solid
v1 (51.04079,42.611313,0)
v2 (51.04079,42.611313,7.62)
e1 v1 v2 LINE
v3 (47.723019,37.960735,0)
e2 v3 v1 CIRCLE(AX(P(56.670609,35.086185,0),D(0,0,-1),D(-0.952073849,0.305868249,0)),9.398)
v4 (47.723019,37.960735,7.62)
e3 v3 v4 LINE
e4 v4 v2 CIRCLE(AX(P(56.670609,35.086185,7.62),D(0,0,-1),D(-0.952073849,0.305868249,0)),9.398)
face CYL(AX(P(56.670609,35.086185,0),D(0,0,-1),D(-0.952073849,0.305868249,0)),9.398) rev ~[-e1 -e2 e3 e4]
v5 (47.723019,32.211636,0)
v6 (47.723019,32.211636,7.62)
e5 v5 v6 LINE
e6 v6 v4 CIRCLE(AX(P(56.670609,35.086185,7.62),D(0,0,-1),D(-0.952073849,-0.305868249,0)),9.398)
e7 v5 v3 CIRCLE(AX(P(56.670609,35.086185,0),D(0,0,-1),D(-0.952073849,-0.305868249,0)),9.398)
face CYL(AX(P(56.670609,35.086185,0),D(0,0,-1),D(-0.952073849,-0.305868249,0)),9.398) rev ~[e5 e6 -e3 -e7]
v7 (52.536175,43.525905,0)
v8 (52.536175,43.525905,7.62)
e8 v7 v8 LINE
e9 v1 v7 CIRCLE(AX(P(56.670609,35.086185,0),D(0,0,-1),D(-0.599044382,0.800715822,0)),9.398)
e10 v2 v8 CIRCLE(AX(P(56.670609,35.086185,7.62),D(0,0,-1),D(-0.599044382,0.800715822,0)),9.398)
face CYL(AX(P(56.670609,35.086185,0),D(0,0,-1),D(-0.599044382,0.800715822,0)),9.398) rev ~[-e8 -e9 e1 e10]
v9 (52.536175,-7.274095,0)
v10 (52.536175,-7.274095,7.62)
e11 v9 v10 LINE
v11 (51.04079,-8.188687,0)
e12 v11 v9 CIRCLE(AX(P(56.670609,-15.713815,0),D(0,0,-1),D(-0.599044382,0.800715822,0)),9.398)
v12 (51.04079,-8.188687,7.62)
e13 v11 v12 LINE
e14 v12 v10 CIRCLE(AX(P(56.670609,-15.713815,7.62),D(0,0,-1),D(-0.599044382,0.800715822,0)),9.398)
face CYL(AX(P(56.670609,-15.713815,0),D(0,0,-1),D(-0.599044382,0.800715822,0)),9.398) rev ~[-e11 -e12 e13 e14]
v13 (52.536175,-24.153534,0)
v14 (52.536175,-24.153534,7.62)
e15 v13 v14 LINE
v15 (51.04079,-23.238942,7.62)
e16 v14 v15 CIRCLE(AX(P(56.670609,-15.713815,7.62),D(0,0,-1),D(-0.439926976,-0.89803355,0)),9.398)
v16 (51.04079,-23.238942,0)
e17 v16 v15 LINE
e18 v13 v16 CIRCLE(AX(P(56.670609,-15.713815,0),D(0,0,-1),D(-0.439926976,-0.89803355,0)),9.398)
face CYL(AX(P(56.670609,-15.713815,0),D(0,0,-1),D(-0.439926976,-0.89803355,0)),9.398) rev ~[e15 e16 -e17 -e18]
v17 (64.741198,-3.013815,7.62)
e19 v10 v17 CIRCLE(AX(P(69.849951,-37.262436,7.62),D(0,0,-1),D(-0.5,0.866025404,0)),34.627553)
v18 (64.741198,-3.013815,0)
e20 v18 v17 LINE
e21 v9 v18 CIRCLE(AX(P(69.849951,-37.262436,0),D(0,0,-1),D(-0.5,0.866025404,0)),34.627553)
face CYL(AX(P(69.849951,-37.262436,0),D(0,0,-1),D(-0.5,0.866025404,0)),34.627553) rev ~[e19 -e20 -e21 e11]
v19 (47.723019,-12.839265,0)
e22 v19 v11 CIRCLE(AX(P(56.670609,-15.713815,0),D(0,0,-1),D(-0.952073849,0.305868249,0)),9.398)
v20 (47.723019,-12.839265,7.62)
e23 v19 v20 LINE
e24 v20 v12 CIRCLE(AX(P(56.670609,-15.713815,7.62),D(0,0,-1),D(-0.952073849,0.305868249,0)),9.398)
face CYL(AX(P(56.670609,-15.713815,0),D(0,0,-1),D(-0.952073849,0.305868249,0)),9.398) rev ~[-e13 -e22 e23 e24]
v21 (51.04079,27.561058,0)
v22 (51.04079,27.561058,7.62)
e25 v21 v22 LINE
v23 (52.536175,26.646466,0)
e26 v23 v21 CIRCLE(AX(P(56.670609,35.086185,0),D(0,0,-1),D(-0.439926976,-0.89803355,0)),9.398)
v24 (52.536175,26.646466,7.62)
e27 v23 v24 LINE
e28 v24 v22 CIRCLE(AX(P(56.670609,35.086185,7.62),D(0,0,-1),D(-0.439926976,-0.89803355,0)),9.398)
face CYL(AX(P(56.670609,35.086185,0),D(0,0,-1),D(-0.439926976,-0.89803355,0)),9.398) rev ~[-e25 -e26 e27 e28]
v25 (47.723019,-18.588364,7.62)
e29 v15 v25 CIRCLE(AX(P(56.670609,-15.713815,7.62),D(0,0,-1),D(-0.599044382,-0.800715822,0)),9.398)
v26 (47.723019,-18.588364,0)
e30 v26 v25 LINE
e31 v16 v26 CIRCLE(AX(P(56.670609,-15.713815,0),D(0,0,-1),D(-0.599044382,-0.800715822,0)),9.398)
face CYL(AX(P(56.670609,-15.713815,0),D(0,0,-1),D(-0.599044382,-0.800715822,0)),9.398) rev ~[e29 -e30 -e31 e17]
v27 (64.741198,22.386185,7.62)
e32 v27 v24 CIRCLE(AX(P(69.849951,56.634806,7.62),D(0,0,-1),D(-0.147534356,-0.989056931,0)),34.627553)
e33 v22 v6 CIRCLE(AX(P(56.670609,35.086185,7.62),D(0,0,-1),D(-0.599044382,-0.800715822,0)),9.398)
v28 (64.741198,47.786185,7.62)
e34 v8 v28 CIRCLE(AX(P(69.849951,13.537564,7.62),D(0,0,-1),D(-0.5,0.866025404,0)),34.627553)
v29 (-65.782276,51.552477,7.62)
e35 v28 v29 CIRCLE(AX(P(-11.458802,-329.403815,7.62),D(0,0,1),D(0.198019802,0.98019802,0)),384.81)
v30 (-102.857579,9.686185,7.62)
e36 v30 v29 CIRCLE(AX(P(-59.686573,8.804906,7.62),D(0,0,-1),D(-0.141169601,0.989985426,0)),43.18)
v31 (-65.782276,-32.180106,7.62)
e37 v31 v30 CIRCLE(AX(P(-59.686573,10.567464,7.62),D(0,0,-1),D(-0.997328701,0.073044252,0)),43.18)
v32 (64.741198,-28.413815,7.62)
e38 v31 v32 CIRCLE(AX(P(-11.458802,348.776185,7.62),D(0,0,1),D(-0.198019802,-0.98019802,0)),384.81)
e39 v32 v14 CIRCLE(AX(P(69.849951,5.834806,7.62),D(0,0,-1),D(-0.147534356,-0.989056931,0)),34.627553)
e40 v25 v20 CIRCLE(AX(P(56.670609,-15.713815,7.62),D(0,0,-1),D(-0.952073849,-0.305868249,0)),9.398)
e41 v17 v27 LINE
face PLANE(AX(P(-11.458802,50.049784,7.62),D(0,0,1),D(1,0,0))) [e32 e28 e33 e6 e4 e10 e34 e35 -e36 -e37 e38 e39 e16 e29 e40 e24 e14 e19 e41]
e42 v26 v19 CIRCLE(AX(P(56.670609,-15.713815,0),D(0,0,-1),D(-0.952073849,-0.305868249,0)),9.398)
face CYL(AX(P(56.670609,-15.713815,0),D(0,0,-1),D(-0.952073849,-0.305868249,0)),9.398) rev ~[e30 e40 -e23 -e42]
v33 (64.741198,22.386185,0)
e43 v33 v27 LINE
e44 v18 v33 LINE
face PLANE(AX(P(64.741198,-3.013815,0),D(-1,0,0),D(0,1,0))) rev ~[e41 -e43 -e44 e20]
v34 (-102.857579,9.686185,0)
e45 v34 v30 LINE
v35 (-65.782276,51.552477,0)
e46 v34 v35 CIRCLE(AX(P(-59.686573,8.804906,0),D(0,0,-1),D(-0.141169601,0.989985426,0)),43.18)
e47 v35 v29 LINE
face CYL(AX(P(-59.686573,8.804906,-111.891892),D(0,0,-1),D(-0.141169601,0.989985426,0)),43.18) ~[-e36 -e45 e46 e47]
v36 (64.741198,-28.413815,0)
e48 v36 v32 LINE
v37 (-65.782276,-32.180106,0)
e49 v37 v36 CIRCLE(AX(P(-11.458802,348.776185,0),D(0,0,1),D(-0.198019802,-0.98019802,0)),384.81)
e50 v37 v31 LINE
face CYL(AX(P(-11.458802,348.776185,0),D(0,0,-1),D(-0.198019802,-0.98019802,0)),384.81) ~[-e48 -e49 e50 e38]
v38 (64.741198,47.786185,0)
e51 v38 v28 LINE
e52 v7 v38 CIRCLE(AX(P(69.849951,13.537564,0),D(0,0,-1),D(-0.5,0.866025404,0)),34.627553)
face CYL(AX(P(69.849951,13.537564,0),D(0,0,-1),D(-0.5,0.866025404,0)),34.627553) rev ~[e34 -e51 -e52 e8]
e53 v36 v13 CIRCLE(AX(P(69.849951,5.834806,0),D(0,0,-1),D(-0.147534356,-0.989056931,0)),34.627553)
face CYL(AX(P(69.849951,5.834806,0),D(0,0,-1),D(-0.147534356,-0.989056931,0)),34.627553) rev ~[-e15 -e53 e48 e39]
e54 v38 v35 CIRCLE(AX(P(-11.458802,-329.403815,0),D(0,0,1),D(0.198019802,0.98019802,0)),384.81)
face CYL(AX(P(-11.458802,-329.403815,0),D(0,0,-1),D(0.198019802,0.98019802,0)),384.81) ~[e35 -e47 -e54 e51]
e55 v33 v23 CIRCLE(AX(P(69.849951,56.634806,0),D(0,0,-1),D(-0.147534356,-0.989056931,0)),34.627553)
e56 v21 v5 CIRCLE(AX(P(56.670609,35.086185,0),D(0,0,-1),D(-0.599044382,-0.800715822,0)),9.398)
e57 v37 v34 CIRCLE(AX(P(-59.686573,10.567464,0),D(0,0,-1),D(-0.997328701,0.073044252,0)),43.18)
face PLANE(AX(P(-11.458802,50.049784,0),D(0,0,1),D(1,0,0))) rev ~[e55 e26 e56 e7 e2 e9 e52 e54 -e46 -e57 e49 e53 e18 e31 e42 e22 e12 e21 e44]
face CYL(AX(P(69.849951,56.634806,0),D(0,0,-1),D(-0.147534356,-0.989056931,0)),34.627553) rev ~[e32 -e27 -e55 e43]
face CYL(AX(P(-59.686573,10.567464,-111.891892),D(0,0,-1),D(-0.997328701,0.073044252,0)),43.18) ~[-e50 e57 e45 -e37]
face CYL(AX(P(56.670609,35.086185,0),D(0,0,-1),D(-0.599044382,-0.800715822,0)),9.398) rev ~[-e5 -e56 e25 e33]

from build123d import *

# Parameters (mm, degrees)
F1_DEPTH    = 7.62
F2_T1_DEPTH = 231.4037837241


# Not quite as in the source:
# - a fillet or chamfer that OpenCascade refuses, or shapes differently, is made with other operations: its cross-section is extruded or revolved along the edge and cut away or added


with BuildPart() as f1:
    # F0 (on Top) → F1 (new body)
    with BuildSketch(Plane.XY):
        with BuildLine():
            ThreePointArc((64.7411976721, 47.7861853946), (-11.4588023279, 55.4061853946), (-87.6588023279, 47.7861853946))
            Line((-87.6588023279, 47.7861853946), (64.7411976721, 47.7861853946))
        make_face()
        with BuildLine():
            Line((-87.6588023279, -28.4138146054), (-87.6588023279, 47.7861853946))
            ThreePointArc((-87.6588023279, 47.7861853946), (-102.8988023279, 9.6861853946), (-87.6588023279, -28.4138146054))
        make_face()
        with BuildLine():
            Line((64.7411976721, 47.7861853946), (-87.6588023279, 47.7861853946))
            Line((-87.6588023279, 47.7861853946), (-87.6588023279, -28.4138146054))
            Line((-87.6588023279, -28.4138146054), (64.7411976721, -28.4138146054))
            ThreePointArc((64.7411976721, -28.4138146054), (58.4381171141, -26.858273051), (52.536175044, -24.1535339048))
            ThreePointArc((52.536175044, -24.1535339048), (51.7671122609, -23.7311786415), (51.0407896557, -23.2389419038))
            ThreePointArc((51.0407896557, -23.2389419038), (46.5861857996, -19.8140652327), (42.744152416, -15.7138146054))
            ThreePointArc((42.744152416, -15.7138146054), (46.5861857996, -11.6135639782), (51.0407896557, -8.188687307))
            ThreePointArc((51.0407896557, -8.188687307), (51.7671122609, -7.6964505693), (52.536175044, -7.2740953061))
            ThreePointArc((52.536175044, -7.2740953061), (58.4381171141, -4.5693561598), (64.7411976721, -3.0138146054))
            Line((64.7411976721, -3.0138146054), (64.7411976721, 22.3861853946))
            ThreePointArc((64.7411976721, 22.3861853946), (58.4381171141, 23.941726949), (52.536175044, 26.6464660952))
            ThreePointArc((52.536175044, 26.6464660952), (51.7671122609, 27.0688213585), (51.0407896557, 27.5610580962))
            ThreePointArc((51.0407896557, 27.5610580962), (46.5861857996, 30.9859347673), (42.744152416, 35.0861853946))
            ThreePointArc((42.744152416, 35.0861853946), (46.5861857996, 39.1864360218), (51.0407896557, 42.611312693))
            ThreePointArc((51.0407896557, 42.611312693), (51.7671122609, 43.1035494307), (52.536175044, 43.5259046939))
            ThreePointArc((52.536175044, 43.5259046939), (58.4381171141, 46.2306438402), (64.7411976721, 47.7861853946))
        make_face()
        with BuildLine():
            Line((64.7411976721, -28.4138146054), (-87.6588023279, -28.4138146054))
            ThreePointArc((-87.6588023279, -28.4138146054), (-11.4588023279, -36.0338146054), (64.7411976721, -28.4138146054))
        make_face()
        with BuildLine():
            ThreePointArc((51.0407896557, -23.2389419038), (49.0199759717, -21.171856557), (47.7230187251, -18.5883644093))
            Line((47.7230187251, -18.5883644093), (42.744152416, -15.7138146054))
            ThreePointArc((42.744152416, -15.7138146054), (46.5861857996, -19.8140652327), (51.0407896557, -23.2389419038))
        make_face()
        with BuildLine():
            Line((42.744152416, -15.7138146054), (47.7230187251, -18.5883644093))
            ThreePointArc((47.7230187251, -18.5883644093), (47.2726087596, -15.7138146054), (47.7230187251, -12.8392648016))
            Line((47.7230187251, -12.8392648016), (42.744152416, -15.7138146054))
        make_face()
        with BuildLine():
            ThreePointArc((51.0407896557, -8.188687307), (46.5861857996, -11.6135639782), (42.744152416, -15.7138146054))
            Line((42.744152416, -15.7138146054), (47.7230187251, -12.8392648016))
            ThreePointArc((47.7230187251, -12.8392648016), (49.0199759717, -10.2557726539), (51.0407896557, -8.188687307))
        make_face()
        with BuildLine():
            Line((42.744152416, 35.0861853946), (47.7230187251, 37.9607351984))
            ThreePointArc((47.7230187251, 37.9607351984), (49.0199759717, 40.5442273461), (51.0407896557, 42.611312693))
            ThreePointArc((51.0407896557, 42.611312693), (46.5861857996, 39.1864360218), (42.744152416, 35.0861853946))
        make_face()
        with BuildLine():
            ThreePointArc((47.7230187251, 32.2116355907), (47.2726087596, 35.0861853946), (47.7230187251, 37.9607351984))
            Line((47.7230187251, 37.9607351984), (42.744152416, 35.0861853946))
            Line((42.744152416, 35.0861853946), (47.7230187251, 32.2116355907))
        make_face()
        with BuildLine():
            Line((47.7230187251, 32.2116355907), (42.744152416, 35.0861853946))
            ThreePointArc((42.744152416, 35.0861853946), (46.5861857996, 30.9859347673), (51.0407896557, 27.5610580962))
            ThreePointArc((51.0407896557, 27.5610580962), (49.0199759717, 29.628143443), (47.7230187251, 32.2116355907))
        make_face()
    extrude(amount=F1_DEPTH)

    # F2: fillet of radius 43.18 on 2 edges, made by hand

    # F2_s2 → F2_t1 (cut)
    with BuildSketch(Plane.XY.offset(-111.891891862)):
        with BuildLine():
            ThreePointArc((-102.7512263975, 13.7215151075), (-93.3157996924, -16.5173565237), (-65.7822764709, -32.1801063989))
            ThreePointArc((-65.7822764709, -32.1801063989), (-76.7477031003, -30.4547410024), (-87.6588023279, -28.4138146054))
            ThreePointArc((-87.6588023279, -28.4138146054), (-99.6630733138, -8.9429787444), (-102.7512263975, 13.7215151075))
        make_face()
        with BuildLine():
            ThreePointArc((-65.7822764709, 51.552477188), (-93.3157996924, 35.8897273129), (-102.7512263975, 5.6508556816))
            ThreePointArc((-102.7512263975, 5.6508556816), (-99.6630733138, 28.3153495335), (-87.6588023279, 47.7861853946))
            ThreePointArc((-87.6588023279, 47.7861853946), (-76.7477031003, 49.8271117916), (-65.7822764709, 51.552477188))
        make_face()
    extrude(amount=F2_T1_DEPTH, mode=Mode.SUBTRACT)


solid = f1.part
